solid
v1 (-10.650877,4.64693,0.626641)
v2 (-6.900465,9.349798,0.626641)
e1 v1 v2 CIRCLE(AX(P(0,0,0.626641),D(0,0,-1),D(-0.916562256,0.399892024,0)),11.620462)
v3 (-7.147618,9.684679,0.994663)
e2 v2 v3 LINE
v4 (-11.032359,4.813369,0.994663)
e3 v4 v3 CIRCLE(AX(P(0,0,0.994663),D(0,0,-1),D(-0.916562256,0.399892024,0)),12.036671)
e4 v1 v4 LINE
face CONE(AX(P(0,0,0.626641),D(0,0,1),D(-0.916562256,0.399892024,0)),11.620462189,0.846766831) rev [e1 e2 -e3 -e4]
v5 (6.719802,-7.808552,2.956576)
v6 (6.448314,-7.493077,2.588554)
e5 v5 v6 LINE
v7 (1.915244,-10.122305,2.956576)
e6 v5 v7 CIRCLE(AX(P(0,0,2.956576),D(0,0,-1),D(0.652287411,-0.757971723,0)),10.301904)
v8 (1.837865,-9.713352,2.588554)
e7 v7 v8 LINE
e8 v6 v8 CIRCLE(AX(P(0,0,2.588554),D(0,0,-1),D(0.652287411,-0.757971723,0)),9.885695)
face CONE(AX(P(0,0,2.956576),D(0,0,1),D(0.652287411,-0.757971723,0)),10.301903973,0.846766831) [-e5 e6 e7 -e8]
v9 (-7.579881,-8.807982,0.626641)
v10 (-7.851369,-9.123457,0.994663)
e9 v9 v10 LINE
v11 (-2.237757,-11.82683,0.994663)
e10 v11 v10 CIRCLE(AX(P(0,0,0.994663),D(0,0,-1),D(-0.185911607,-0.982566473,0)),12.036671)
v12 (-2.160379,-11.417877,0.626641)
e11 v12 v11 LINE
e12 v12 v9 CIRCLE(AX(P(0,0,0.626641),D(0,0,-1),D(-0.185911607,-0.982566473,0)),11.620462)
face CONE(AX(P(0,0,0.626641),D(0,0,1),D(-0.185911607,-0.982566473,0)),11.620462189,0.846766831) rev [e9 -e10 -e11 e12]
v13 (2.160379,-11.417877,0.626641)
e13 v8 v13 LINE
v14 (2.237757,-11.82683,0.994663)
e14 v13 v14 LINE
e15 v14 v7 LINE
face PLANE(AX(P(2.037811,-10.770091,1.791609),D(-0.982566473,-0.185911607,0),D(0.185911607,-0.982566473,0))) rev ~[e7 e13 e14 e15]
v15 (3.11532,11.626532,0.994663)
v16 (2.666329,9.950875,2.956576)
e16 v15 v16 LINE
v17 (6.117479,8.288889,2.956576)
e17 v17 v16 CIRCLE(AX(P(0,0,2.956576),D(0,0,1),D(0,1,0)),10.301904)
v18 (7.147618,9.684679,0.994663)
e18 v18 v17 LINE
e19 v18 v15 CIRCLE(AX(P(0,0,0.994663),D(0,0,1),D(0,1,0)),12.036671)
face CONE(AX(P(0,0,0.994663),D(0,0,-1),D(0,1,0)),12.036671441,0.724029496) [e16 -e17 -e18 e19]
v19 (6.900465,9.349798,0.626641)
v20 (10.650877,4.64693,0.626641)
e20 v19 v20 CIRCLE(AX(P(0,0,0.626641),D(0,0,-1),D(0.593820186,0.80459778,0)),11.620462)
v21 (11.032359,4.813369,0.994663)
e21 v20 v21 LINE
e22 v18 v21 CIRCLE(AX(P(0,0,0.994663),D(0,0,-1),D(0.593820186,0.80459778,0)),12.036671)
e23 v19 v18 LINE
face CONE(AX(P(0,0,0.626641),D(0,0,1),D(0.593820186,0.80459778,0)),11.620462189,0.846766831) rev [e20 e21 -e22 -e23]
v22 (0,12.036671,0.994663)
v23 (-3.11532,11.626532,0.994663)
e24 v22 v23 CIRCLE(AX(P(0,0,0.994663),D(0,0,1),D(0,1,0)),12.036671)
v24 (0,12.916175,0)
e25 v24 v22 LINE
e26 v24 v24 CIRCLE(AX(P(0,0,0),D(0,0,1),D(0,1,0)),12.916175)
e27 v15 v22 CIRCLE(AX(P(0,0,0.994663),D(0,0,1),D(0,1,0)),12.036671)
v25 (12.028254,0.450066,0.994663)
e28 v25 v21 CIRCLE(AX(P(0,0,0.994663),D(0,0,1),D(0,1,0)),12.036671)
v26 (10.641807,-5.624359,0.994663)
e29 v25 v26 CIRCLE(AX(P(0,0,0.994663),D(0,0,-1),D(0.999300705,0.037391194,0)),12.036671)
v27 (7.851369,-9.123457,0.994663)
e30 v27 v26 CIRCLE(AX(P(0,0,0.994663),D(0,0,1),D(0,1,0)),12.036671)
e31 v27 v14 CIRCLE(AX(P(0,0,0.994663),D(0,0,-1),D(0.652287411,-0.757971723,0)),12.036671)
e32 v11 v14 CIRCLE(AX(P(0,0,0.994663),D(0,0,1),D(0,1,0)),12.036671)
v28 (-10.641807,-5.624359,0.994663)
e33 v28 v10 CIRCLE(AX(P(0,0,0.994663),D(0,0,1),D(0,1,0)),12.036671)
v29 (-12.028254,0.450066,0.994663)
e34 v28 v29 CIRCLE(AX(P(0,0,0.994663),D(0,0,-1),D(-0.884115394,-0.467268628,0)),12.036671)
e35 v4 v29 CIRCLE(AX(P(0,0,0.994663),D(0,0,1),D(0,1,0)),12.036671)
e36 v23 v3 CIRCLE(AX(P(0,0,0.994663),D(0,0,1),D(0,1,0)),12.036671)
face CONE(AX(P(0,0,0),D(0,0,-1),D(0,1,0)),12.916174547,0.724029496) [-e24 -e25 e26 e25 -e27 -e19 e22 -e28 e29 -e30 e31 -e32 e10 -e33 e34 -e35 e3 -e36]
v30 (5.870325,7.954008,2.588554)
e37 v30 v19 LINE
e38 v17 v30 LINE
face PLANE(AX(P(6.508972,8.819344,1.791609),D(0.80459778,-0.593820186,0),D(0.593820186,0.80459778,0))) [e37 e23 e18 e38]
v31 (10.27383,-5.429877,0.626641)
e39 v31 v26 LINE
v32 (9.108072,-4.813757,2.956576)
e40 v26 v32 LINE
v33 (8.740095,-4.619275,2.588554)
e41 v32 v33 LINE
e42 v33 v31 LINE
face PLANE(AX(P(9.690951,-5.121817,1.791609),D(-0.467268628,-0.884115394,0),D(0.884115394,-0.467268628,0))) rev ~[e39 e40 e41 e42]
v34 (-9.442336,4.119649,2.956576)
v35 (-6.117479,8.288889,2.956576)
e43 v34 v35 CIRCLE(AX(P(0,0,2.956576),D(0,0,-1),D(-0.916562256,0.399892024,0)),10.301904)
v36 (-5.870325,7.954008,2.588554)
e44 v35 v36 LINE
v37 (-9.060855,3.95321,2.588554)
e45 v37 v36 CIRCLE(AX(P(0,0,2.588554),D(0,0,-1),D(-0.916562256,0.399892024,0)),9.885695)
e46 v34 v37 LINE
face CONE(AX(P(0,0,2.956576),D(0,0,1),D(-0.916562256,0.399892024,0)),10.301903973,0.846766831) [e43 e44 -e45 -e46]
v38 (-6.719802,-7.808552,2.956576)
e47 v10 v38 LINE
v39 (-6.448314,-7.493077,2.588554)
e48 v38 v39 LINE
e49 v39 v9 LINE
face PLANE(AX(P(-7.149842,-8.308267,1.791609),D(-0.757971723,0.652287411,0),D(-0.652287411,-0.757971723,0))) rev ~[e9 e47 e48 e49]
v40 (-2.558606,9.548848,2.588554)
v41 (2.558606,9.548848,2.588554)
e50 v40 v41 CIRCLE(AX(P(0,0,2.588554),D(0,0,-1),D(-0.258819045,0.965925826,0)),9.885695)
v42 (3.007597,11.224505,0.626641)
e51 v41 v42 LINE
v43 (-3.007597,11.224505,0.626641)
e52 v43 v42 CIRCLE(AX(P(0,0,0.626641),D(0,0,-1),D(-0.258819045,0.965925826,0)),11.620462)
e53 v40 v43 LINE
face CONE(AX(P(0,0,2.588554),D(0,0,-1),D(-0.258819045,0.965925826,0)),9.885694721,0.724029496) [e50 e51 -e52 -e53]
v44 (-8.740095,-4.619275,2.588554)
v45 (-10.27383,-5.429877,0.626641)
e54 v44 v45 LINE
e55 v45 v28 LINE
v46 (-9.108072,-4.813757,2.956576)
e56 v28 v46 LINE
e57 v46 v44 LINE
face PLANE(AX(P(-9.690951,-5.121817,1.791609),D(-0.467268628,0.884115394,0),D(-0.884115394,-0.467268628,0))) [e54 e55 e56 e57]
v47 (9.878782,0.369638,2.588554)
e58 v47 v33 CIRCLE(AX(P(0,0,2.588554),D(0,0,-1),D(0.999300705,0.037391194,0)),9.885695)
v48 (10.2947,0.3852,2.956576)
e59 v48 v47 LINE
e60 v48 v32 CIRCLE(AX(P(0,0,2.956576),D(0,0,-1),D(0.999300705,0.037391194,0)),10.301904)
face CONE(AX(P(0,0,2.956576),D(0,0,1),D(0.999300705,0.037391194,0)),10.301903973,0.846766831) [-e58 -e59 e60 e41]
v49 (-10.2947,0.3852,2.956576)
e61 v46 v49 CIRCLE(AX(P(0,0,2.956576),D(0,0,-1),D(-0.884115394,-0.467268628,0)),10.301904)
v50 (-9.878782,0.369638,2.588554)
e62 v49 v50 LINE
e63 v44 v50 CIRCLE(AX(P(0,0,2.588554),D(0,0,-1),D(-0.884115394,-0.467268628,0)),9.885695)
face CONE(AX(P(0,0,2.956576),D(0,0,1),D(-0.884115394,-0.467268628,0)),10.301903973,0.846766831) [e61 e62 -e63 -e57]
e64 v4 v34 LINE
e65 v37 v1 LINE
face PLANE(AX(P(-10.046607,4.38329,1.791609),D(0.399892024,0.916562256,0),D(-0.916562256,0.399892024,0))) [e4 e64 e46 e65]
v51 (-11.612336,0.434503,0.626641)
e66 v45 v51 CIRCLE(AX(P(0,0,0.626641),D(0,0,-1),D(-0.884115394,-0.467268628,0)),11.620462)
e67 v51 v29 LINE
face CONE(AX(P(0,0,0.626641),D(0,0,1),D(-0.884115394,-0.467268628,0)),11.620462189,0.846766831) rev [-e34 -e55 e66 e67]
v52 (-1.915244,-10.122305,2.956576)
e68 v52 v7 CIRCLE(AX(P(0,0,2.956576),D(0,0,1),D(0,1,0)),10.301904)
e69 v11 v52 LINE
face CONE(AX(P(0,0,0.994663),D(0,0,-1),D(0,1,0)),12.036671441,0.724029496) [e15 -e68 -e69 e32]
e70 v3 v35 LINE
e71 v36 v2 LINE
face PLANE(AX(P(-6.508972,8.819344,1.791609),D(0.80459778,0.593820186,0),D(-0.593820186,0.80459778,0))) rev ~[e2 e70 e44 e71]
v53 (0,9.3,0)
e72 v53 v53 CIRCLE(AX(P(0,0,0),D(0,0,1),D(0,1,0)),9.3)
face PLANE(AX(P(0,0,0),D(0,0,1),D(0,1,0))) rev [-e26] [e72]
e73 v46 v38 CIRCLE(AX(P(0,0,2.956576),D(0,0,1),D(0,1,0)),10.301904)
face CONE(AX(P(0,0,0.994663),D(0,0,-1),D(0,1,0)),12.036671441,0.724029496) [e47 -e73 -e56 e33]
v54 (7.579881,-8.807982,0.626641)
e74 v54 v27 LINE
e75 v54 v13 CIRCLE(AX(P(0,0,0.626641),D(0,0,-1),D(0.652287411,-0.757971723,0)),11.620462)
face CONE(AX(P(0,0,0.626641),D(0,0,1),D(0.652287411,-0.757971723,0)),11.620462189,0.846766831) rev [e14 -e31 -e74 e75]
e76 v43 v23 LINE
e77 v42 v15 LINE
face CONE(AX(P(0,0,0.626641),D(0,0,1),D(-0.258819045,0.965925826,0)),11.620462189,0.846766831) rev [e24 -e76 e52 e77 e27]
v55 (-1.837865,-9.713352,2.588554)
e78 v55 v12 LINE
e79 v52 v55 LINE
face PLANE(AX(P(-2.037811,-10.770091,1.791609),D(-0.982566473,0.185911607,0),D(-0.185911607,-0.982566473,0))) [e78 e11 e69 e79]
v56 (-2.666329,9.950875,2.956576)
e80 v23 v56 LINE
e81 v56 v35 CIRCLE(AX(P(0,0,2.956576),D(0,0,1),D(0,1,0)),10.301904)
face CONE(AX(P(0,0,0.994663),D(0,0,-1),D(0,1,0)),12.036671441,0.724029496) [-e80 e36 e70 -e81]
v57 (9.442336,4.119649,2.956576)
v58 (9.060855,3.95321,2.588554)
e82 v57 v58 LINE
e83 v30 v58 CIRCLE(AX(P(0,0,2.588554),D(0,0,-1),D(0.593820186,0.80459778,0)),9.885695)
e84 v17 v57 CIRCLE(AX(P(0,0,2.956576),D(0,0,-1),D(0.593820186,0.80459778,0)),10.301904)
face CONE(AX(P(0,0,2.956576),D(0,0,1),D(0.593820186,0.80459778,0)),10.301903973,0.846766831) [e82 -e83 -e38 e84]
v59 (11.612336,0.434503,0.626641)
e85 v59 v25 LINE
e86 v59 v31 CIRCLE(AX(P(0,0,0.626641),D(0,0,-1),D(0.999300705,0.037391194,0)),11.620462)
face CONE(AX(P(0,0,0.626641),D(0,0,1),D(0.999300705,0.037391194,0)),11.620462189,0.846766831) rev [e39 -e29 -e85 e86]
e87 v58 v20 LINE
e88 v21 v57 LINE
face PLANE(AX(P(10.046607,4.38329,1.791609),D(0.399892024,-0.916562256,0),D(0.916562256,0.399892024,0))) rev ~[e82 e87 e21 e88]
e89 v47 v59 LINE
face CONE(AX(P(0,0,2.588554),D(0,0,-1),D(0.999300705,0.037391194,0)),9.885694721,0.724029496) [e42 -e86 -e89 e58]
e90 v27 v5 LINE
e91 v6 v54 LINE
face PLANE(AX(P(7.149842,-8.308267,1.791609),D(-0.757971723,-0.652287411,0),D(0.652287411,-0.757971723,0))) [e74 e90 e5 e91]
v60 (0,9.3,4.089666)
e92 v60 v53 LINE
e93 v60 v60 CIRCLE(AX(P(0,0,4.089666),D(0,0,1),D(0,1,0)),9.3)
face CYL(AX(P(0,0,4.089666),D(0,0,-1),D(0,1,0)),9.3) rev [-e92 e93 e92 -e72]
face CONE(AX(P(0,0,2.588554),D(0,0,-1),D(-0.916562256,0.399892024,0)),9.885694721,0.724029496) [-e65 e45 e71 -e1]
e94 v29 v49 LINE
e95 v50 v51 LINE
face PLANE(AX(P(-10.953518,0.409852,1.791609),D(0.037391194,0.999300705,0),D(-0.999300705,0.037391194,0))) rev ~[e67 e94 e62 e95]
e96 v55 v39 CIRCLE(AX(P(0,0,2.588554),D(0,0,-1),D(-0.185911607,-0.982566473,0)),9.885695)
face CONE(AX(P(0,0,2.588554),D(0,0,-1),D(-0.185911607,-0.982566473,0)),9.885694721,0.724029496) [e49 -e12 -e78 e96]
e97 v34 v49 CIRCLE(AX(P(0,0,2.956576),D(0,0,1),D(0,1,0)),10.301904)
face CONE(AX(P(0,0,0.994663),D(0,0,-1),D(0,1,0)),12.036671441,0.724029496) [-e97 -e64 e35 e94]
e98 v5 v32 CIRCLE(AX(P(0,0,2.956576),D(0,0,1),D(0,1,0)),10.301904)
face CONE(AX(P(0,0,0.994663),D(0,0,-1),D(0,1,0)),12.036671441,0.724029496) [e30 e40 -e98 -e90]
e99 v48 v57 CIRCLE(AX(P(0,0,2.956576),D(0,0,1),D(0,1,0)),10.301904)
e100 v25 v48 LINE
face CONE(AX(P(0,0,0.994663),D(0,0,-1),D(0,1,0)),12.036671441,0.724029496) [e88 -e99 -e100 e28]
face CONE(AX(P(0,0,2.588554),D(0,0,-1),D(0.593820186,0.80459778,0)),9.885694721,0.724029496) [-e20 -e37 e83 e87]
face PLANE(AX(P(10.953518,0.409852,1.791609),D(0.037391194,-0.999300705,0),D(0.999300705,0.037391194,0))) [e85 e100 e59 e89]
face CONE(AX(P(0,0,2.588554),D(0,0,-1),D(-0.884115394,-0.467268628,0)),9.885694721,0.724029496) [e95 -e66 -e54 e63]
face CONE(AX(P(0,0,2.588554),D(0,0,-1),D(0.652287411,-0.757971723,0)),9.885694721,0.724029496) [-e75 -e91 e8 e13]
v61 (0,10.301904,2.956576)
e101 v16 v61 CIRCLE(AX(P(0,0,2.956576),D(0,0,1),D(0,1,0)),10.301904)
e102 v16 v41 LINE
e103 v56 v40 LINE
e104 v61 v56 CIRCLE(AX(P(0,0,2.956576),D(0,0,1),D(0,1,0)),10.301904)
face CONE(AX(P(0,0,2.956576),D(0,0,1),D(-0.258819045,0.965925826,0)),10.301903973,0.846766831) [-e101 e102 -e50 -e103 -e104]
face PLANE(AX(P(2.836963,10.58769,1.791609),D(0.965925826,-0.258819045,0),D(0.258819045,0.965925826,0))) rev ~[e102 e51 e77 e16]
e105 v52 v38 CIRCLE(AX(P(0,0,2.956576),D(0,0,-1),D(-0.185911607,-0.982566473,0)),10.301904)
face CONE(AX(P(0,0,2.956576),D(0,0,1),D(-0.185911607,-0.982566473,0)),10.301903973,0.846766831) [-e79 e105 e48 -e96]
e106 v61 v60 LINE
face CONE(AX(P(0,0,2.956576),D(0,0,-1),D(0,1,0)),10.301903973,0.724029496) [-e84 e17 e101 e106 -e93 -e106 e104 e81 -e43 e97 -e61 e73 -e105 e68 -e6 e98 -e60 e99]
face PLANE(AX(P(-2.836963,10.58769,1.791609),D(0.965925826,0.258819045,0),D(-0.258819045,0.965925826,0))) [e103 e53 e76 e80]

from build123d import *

# Parameters (mm, degrees)
F2_ANGLE_BACK   = 15
F2_ANGLE        = 30
F2_COPIES_COUNT = 7


# Not quite as in the source:
# - a pattern or mirror of a feature is missing from the dataset's text; its kind, count and spacing are read off the source's solid


with BuildPart() as f1:
    # F0 (on Right) → F1 (revolve)
    with BuildSketch(Plane.YZ):
        Polygon((9.3, 4.0896662887), (9.3, 0), (12.9161745474, 0), (12.0366714414, 0.9946627731), (11.620462189, 0.6266412283), (9.8856947209, 2.5885542775), (10.3019039734, 2.9565758223), align=None)
        Polygon((11.620462189, 0.6266412283), (12.0366714414, 0.9946627731), (10.3019039734, 2.9565758223), (9.8856947209, 2.5885542775), align=None)
    revolve(axis=Axis((0, 0, 2.1812447902), (0, 0, 1)))

    # F0 (on Right) → F2 (revolve, cut)
    with BuildSketch(Plane.YZ, mode=Mode.PRIVATE) as f2_sk:
        Polygon((11.620462189, 0.6266412283), (12.0366714414, 0.9946627731), (10.3019039734, 2.9565758223), (9.8856947209, 2.5885542775), align=None)
    f2 = revolve(f2_sk.sketch.rotate(Axis((0, 0, 2.1812447902), (0, 0, -1)), -F2_ANGLE_BACK), axis=Axis((0, 0, 2.1812447902), (0, 0, -1)), revolution_arc=F2_ANGLE, mode=Mode.SUBTRACT)

    # F2_copies: F2 ×7 about axis
    f2_copies_axis = Axis((0, 0, 0), (0, 0, 1))
    for i in range(1, F2_COPIES_COUNT):
        add(f2.rotate(f2_copies_axis, i * 360 / F2_COPIES_COUNT), mode=Mode.SUBTRACT)


solid = f1.part
